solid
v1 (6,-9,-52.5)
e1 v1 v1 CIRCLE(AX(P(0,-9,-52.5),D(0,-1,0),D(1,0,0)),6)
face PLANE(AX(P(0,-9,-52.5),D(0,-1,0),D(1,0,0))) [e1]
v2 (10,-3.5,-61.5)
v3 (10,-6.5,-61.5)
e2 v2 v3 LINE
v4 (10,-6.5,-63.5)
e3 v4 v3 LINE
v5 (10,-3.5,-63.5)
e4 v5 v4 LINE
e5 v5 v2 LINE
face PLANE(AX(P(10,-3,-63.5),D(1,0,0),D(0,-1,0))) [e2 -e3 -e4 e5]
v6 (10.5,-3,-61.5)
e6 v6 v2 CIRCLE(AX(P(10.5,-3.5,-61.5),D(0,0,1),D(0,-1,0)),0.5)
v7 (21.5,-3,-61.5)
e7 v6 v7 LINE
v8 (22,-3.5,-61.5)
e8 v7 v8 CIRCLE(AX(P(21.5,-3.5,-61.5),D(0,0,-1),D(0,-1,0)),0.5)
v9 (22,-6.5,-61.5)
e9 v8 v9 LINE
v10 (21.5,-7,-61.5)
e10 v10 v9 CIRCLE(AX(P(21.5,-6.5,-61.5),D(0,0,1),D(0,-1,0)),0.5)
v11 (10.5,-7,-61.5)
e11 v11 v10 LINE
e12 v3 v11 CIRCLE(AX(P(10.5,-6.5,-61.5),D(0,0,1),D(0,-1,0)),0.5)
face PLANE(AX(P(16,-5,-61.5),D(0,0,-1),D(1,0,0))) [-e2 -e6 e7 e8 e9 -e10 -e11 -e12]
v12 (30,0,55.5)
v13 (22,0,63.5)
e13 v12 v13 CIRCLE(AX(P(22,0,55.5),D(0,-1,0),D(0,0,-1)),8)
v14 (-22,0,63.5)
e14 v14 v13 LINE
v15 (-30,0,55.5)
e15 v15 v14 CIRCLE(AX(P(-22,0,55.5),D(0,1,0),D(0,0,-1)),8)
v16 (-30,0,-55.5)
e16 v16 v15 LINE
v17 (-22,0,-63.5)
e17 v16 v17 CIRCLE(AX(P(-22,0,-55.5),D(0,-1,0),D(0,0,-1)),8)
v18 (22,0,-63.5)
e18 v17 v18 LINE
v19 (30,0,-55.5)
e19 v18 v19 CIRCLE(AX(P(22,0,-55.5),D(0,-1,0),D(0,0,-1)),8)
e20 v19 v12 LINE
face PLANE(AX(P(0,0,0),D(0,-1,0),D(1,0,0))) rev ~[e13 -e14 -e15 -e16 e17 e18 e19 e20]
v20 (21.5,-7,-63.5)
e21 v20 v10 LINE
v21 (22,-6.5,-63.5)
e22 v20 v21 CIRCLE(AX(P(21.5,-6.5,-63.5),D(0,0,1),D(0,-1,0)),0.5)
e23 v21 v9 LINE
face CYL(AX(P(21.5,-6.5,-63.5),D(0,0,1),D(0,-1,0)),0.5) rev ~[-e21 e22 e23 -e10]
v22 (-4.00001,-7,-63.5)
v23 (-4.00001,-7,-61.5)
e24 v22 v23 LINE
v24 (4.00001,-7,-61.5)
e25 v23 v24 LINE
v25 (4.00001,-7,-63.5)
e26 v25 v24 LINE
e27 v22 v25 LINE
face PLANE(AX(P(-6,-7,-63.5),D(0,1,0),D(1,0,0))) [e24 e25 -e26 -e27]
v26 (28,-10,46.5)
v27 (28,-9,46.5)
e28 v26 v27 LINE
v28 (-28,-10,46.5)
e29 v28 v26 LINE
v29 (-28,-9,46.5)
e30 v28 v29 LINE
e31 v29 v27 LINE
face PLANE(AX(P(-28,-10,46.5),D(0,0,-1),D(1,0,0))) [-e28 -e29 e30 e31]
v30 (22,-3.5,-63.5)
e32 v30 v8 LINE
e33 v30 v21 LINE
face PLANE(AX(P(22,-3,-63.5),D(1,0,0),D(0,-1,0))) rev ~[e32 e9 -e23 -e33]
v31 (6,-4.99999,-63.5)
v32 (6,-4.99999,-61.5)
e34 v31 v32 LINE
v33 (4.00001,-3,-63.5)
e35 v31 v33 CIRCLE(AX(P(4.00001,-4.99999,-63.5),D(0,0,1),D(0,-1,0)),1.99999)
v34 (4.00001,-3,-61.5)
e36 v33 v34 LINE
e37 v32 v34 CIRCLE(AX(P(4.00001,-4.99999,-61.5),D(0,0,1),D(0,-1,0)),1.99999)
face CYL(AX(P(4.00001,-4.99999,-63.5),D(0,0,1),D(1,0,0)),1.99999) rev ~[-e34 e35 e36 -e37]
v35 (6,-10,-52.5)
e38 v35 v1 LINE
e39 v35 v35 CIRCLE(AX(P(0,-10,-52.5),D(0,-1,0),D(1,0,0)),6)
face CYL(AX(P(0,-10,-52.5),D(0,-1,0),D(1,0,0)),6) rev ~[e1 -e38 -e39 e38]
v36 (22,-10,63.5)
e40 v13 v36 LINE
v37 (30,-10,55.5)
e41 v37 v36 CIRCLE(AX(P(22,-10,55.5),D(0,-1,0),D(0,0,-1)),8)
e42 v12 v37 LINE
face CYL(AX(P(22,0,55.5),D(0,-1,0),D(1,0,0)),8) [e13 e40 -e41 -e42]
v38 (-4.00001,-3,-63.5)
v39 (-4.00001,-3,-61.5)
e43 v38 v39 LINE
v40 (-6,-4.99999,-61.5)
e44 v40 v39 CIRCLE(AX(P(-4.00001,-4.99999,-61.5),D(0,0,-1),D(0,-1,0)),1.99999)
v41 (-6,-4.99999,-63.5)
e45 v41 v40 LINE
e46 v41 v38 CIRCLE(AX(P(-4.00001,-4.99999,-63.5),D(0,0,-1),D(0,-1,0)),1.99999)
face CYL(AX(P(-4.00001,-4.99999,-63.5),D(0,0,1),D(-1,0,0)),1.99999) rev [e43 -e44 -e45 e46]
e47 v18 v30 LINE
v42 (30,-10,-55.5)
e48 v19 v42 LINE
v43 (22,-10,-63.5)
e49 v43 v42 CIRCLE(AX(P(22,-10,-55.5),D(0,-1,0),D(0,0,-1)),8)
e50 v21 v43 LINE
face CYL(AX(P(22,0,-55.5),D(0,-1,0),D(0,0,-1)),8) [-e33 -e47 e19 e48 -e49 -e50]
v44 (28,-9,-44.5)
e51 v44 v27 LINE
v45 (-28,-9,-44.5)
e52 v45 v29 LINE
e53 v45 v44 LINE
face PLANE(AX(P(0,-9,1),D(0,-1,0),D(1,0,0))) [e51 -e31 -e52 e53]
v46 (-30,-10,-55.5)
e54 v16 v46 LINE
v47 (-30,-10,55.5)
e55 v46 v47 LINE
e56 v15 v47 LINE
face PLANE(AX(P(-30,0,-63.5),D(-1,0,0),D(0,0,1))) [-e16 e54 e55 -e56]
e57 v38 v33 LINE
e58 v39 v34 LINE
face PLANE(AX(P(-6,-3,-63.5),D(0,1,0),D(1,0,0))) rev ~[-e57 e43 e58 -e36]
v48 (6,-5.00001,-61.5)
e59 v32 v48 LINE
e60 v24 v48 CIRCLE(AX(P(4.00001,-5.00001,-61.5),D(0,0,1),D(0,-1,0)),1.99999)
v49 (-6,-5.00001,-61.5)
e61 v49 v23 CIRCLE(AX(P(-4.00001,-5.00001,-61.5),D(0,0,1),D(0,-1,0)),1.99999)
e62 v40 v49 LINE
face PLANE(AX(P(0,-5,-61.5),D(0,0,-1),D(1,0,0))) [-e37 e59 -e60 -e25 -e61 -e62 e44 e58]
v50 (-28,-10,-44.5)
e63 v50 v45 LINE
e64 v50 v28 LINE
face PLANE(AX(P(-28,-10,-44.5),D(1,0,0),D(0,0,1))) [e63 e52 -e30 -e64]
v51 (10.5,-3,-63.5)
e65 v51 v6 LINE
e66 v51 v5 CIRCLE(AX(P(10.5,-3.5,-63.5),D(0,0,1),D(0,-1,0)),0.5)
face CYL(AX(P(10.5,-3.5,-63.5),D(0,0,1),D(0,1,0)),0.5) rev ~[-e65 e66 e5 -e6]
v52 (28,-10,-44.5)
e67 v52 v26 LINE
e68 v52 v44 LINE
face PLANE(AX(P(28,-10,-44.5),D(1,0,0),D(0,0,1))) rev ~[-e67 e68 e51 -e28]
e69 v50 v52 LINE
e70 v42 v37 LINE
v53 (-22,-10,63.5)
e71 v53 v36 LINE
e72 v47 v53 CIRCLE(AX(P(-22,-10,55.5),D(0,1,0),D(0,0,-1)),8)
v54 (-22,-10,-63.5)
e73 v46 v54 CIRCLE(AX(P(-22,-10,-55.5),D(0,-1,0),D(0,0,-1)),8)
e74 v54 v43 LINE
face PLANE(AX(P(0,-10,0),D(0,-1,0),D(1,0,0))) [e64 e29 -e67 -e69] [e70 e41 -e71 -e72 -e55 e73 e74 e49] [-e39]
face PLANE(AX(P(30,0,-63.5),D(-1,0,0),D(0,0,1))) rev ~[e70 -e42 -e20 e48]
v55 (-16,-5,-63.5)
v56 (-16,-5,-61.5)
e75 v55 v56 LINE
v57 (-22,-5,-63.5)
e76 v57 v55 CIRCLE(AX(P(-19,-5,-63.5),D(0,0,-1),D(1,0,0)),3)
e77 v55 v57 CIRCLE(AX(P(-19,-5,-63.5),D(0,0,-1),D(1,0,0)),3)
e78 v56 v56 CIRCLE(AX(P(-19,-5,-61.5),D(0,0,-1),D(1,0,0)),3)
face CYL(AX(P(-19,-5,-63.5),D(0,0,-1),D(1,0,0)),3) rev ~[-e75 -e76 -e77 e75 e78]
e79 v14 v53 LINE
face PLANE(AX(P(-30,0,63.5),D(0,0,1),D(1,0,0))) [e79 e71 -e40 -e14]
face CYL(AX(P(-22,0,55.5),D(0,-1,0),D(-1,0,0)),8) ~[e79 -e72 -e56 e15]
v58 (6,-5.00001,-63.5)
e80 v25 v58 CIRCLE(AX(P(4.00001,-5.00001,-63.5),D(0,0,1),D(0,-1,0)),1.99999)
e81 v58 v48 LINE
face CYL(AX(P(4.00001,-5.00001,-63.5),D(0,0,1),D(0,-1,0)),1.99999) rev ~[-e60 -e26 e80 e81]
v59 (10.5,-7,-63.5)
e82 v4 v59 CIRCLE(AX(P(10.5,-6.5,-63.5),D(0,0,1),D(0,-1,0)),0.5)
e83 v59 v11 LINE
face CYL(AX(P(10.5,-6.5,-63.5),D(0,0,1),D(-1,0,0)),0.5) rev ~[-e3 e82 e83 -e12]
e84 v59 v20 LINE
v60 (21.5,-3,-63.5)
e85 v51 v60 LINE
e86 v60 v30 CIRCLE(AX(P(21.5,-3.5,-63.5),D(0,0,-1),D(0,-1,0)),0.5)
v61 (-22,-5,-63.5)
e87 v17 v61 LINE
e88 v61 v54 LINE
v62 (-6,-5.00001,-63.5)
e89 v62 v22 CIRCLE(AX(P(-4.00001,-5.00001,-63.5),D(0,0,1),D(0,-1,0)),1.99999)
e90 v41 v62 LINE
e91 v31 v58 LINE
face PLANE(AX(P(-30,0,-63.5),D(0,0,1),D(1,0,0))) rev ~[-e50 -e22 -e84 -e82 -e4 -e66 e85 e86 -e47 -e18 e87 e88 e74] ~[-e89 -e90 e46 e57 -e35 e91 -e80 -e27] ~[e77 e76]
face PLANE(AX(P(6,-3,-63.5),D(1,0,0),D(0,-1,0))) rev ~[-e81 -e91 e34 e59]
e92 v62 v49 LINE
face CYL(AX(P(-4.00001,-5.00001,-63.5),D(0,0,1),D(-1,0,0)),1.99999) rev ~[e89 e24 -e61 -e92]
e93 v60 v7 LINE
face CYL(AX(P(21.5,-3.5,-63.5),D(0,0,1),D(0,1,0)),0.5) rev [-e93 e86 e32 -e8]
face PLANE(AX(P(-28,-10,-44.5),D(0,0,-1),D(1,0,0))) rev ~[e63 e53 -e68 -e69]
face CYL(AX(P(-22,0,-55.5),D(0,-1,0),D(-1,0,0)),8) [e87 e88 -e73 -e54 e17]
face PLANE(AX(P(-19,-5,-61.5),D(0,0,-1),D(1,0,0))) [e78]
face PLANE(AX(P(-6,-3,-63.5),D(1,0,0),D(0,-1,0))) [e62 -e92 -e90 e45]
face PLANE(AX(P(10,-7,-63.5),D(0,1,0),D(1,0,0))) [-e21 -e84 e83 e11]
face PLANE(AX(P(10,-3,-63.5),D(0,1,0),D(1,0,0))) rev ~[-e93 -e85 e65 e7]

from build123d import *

# Parameters (mm, degrees)
F0_W     = 60
F0_H     = 127
F1_DEPTH = 10
F2_R     = 8
F3_R     = 6
F4_DEPTH = 1
F5_W     = 56
F5_H     = 91
F6_DEPTH = 1
F7_W     = 12
F7_H     = 4
F7_R     = 3
F8_DEPTH = 2
F9_R     = 1.99999
F10_R    = 0.5


# Not quite as in the source:
# - a fillet or chamfer is up to 0.001 mm smaller than in the source, because OpenCascade refuses the exact size


with BuildPart() as f1:
    # F0 (on Front) → F1 (new body)
    with BuildSketch(Plane.XZ):
        Rectangle(F0_W, F0_H)
    extrude(amount=F1_DEPTH)

    # F2
    f2_edges = [f1.edges().sort_by_distance(p)[0] for p in [
        (30, -5, 63.5),
        (-30, -5, 63.5),
        (30, -5, -63.5),
        (-30, -5, -63.5),
    ]]
    fillet(f2_edges, radius=F2_R)

    # F3 (on face) → F4 (cut)
    with BuildSketch(Plane.XZ.offset(10)):
        with Locations((0, -52.5)):
            Circle(F3_R)
    extrude(amount=-F4_DEPTH, mode=Mode.SUBTRACT)

    # F5 (on face) → F6 (cut)
    with BuildSketch(Plane.XZ.offset(10)):
        with Locations((0, 1)):
            Rectangle(F5_W, F5_H)
    extrude(amount=-F6_DEPTH, mode=Mode.SUBTRACT)

    # F7 (on face) → F8 (cut)
    with BuildSketch(Plane(origin=(0, 0, -63.5), x_dir=(1, 0, 0), z_dir=(0, 0, -1))):
        with Locations((0, 5)):
            Rectangle(F7_W, F7_H)
        with Locations((16, 5)):
            Rectangle(F7_W, F7_H)
        with Locations((-19, 5)):
            Circle(F7_R)
    extrude(amount=-F8_DEPTH, mode=Mode.SUBTRACT)

    # F9 (radius 2 in the source; OpenCascade refuses exactly that, so slightly less here)
    f9_edges = [f1.edges().sort_by_distance(p)[0] for p in [
        (-6, -7, -62.5),
        (-6, -3, -62.5),
        (6, -7, -62.5),
        (6, -3, -62.5),
    ]]
    fillet(f9_edges, radius=F9_R)

    # F10
    f10_edges = [f1.edges().sort_by_distance(p)[0] for p in [
        (10, -7, -62.5),
        (10, -3, -62.5),
        (22, -3, -62.5),
        (22, -7, -62.5),
    ]]
    fillet(f10_edges, radius=F10_R)


solid = f1.part
